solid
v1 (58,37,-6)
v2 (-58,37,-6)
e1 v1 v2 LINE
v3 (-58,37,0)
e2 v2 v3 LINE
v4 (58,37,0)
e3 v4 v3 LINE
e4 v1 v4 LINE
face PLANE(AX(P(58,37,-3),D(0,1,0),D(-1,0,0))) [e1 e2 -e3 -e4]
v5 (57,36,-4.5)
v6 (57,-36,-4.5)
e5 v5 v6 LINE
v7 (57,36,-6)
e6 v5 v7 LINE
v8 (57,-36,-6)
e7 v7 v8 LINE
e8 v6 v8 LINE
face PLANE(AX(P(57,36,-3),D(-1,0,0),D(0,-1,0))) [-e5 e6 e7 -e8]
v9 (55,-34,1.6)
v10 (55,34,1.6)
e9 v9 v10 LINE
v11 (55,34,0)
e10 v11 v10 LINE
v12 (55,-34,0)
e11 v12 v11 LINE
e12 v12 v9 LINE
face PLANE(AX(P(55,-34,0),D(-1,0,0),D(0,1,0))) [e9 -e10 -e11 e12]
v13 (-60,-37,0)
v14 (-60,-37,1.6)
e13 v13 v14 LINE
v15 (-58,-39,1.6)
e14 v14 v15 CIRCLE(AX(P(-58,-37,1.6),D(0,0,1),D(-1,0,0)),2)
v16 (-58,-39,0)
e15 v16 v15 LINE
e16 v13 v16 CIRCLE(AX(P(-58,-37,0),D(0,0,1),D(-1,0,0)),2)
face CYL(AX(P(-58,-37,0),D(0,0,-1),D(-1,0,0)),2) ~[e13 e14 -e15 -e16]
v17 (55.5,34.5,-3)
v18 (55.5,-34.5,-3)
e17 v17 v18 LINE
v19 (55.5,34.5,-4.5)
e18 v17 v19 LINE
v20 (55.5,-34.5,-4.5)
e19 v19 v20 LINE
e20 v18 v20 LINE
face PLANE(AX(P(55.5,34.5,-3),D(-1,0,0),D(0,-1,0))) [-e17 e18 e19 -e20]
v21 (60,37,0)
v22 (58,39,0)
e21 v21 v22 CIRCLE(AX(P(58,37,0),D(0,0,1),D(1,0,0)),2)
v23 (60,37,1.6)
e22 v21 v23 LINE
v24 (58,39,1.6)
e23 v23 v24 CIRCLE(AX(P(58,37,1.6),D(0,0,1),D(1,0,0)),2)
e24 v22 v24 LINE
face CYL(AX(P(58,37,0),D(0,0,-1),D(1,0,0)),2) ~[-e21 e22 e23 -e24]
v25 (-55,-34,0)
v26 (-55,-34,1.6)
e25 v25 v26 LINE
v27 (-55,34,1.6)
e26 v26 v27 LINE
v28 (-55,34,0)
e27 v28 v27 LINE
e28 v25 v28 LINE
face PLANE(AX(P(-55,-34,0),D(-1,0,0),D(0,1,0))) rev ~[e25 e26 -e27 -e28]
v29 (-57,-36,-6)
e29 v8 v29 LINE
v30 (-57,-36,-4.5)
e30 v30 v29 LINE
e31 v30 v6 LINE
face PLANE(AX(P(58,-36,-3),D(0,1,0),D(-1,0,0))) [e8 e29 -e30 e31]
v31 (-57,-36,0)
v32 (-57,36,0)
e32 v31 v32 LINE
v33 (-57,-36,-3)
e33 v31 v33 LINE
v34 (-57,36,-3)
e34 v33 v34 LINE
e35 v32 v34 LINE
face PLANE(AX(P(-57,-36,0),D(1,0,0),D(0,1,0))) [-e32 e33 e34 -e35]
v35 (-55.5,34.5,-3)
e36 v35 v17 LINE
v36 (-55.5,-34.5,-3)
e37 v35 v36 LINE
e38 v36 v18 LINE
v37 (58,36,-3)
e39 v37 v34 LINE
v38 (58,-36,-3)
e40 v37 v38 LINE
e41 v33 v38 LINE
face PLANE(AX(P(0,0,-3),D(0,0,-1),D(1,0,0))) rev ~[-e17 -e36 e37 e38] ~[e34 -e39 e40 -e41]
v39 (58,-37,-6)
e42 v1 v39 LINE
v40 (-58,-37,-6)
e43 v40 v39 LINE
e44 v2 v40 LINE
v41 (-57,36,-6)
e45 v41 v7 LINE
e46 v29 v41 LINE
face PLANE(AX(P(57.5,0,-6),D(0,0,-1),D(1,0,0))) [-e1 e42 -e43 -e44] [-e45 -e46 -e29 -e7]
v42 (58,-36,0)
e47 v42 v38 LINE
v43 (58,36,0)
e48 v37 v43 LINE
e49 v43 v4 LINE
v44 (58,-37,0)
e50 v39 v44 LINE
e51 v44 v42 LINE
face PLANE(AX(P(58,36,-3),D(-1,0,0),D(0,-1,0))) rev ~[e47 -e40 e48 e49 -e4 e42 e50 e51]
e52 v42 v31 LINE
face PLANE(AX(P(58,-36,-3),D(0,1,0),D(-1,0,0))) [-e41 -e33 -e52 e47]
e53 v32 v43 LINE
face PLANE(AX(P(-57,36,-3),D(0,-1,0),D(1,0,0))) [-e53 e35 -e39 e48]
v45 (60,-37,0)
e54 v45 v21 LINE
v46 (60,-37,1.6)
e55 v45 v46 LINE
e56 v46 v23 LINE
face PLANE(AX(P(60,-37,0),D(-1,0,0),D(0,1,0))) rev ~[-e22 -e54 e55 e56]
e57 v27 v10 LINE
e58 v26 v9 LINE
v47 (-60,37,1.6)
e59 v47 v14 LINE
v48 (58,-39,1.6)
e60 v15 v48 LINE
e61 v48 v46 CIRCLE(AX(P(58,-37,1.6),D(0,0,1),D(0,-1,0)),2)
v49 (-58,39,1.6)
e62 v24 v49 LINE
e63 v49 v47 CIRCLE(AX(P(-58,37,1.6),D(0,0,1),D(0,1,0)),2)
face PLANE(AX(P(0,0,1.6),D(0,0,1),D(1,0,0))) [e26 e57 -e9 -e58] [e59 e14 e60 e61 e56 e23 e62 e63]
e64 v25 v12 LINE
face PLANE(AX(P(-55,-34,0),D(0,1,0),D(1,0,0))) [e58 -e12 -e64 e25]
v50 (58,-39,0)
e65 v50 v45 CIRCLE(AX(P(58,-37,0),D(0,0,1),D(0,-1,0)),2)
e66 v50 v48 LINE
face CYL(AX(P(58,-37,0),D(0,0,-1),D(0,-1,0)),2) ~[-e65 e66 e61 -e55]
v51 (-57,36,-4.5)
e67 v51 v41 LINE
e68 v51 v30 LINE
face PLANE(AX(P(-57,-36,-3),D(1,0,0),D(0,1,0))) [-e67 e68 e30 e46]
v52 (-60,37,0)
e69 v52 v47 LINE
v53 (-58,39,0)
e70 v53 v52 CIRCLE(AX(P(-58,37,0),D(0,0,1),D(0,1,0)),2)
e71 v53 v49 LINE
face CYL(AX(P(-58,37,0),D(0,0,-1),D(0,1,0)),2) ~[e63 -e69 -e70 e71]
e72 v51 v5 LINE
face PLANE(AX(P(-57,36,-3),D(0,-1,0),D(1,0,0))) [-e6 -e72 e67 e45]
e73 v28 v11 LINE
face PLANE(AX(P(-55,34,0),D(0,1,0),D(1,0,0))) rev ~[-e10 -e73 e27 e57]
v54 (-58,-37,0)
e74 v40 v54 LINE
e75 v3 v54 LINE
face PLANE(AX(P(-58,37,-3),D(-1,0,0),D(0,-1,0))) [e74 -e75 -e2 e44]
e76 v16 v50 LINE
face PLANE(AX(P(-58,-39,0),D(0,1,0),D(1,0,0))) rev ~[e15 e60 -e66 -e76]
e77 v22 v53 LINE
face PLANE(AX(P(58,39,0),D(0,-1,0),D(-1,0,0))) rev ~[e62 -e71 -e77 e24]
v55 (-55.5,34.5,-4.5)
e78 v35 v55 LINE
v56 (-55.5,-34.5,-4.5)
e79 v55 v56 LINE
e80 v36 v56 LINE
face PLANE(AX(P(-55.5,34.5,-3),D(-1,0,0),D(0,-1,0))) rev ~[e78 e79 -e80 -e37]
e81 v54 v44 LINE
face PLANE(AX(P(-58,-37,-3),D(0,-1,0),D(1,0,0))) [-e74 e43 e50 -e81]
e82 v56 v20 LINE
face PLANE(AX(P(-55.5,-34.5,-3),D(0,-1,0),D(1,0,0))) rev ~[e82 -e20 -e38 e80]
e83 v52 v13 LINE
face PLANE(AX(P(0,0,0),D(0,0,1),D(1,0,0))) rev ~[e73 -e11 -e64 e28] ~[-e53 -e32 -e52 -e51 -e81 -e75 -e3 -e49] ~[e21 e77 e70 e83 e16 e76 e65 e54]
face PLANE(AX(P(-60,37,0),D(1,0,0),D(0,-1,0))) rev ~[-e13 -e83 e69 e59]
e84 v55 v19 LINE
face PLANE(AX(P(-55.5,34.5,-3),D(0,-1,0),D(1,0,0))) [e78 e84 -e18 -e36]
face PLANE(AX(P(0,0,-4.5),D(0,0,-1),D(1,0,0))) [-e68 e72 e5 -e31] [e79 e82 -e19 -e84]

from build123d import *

# Parameters (mm, degrees)
F0_W     = 114
F0_H     = 72
F0_W_2   = 110
F0_H_2   = 68
F0_W_3   = 1
F1_DEPTH = 1.6
F2_DEPTH = 3
F3_W     = 114
F3_H     = 72
F3_W_2   = 111
F3_H_2   = 69
F4_DEPTH = 1.5
F5_DEPTH = 3
F3_W_3   = 1
F6_DEPTH = 3


with BuildPart() as f1:
    # F0 (on Top) → F1 (new body)
    with BuildSketch(Plane.XY):
        with BuildLine():
            Line((58, 39), (-58, 39))
            ThreePointArc((-58, 39), (-59.4142135624, 38.4142135624), (-60, 37))
            Line((-60, 37), (-60, -37))
            ThreePointArc((-60, -37), (-59.4142135624, -38.4142135624), (-58, -39))
            Line((-58, -39), (58, -39))
            ThreePointArc((58, -39), (59.4142135624, -38.4142135624), (60, -37))
            Line((60, -37), (60, 37))
            ThreePointArc((60, 37), (59.4142135624, 38.4142135624), (58, 39))
        make_face()
        Polygon((58, 37), (58, 36), (58, -36), (58, -37), (-58, -37), (-58, 37), align=None, mode=Mode.SUBTRACT)
        Polygon((-57, -36), (-57, 36), (57, 36), (58, 36), (58, 37), (-58, 37), (-58, -37), (58, -37), (58, -36), (57, -36), align=None)
        Rectangle(F0_W, F0_H)
        Rectangle(F0_W_2, F0_H_2, mode=Mode.SUBTRACT)
        with Locations((57.5, 0)):
            Rectangle(F0_W_3, F0_H)
    extrude(amount=F1_DEPTH)

    # F0 (on Top) → F2 (join)
    with BuildSketch(Plane.XY):
        Polygon((-57, -36), (-57, 36), (57, 36), (58, 36), (58, 37), (-58, 37), (-58, -37), (58, -37), (58, -36), (57, -36), align=None)
    extrude(amount=-F2_DEPTH)

    # F3 (on face) → F4 (join)
    with BuildSketch(Plane(origin=(0, 0, -3), x_dir=(1, 0, 0), z_dir=(0, 0, -1))):
        Rectangle(F3_W, F3_H)
        Rectangle(F3_W_2, F3_H_2, mode=Mode.SUBTRACT)
    extrude(amount=F4_DEPTH)

    # F5 (add): a face of the model
    f5_faces = [f1.faces().sort_by_distance(p)[0] for p in [
        (-57.1375936045, 0, -3),
    ]]
    extrude(f5_faces, amount=F5_DEPTH)

    # F3 (on face) → F6 (join)
    with BuildSketch(Plane(origin=(0, 0, -3), x_dir=(1, 0, 0), z_dir=(0, 0, -1))):
        with Locations((57.5, 0)):
            Rectangle(F3_W_3, F3_H)
    extrude(amount=F6_DEPTH)


solid = f1.part
